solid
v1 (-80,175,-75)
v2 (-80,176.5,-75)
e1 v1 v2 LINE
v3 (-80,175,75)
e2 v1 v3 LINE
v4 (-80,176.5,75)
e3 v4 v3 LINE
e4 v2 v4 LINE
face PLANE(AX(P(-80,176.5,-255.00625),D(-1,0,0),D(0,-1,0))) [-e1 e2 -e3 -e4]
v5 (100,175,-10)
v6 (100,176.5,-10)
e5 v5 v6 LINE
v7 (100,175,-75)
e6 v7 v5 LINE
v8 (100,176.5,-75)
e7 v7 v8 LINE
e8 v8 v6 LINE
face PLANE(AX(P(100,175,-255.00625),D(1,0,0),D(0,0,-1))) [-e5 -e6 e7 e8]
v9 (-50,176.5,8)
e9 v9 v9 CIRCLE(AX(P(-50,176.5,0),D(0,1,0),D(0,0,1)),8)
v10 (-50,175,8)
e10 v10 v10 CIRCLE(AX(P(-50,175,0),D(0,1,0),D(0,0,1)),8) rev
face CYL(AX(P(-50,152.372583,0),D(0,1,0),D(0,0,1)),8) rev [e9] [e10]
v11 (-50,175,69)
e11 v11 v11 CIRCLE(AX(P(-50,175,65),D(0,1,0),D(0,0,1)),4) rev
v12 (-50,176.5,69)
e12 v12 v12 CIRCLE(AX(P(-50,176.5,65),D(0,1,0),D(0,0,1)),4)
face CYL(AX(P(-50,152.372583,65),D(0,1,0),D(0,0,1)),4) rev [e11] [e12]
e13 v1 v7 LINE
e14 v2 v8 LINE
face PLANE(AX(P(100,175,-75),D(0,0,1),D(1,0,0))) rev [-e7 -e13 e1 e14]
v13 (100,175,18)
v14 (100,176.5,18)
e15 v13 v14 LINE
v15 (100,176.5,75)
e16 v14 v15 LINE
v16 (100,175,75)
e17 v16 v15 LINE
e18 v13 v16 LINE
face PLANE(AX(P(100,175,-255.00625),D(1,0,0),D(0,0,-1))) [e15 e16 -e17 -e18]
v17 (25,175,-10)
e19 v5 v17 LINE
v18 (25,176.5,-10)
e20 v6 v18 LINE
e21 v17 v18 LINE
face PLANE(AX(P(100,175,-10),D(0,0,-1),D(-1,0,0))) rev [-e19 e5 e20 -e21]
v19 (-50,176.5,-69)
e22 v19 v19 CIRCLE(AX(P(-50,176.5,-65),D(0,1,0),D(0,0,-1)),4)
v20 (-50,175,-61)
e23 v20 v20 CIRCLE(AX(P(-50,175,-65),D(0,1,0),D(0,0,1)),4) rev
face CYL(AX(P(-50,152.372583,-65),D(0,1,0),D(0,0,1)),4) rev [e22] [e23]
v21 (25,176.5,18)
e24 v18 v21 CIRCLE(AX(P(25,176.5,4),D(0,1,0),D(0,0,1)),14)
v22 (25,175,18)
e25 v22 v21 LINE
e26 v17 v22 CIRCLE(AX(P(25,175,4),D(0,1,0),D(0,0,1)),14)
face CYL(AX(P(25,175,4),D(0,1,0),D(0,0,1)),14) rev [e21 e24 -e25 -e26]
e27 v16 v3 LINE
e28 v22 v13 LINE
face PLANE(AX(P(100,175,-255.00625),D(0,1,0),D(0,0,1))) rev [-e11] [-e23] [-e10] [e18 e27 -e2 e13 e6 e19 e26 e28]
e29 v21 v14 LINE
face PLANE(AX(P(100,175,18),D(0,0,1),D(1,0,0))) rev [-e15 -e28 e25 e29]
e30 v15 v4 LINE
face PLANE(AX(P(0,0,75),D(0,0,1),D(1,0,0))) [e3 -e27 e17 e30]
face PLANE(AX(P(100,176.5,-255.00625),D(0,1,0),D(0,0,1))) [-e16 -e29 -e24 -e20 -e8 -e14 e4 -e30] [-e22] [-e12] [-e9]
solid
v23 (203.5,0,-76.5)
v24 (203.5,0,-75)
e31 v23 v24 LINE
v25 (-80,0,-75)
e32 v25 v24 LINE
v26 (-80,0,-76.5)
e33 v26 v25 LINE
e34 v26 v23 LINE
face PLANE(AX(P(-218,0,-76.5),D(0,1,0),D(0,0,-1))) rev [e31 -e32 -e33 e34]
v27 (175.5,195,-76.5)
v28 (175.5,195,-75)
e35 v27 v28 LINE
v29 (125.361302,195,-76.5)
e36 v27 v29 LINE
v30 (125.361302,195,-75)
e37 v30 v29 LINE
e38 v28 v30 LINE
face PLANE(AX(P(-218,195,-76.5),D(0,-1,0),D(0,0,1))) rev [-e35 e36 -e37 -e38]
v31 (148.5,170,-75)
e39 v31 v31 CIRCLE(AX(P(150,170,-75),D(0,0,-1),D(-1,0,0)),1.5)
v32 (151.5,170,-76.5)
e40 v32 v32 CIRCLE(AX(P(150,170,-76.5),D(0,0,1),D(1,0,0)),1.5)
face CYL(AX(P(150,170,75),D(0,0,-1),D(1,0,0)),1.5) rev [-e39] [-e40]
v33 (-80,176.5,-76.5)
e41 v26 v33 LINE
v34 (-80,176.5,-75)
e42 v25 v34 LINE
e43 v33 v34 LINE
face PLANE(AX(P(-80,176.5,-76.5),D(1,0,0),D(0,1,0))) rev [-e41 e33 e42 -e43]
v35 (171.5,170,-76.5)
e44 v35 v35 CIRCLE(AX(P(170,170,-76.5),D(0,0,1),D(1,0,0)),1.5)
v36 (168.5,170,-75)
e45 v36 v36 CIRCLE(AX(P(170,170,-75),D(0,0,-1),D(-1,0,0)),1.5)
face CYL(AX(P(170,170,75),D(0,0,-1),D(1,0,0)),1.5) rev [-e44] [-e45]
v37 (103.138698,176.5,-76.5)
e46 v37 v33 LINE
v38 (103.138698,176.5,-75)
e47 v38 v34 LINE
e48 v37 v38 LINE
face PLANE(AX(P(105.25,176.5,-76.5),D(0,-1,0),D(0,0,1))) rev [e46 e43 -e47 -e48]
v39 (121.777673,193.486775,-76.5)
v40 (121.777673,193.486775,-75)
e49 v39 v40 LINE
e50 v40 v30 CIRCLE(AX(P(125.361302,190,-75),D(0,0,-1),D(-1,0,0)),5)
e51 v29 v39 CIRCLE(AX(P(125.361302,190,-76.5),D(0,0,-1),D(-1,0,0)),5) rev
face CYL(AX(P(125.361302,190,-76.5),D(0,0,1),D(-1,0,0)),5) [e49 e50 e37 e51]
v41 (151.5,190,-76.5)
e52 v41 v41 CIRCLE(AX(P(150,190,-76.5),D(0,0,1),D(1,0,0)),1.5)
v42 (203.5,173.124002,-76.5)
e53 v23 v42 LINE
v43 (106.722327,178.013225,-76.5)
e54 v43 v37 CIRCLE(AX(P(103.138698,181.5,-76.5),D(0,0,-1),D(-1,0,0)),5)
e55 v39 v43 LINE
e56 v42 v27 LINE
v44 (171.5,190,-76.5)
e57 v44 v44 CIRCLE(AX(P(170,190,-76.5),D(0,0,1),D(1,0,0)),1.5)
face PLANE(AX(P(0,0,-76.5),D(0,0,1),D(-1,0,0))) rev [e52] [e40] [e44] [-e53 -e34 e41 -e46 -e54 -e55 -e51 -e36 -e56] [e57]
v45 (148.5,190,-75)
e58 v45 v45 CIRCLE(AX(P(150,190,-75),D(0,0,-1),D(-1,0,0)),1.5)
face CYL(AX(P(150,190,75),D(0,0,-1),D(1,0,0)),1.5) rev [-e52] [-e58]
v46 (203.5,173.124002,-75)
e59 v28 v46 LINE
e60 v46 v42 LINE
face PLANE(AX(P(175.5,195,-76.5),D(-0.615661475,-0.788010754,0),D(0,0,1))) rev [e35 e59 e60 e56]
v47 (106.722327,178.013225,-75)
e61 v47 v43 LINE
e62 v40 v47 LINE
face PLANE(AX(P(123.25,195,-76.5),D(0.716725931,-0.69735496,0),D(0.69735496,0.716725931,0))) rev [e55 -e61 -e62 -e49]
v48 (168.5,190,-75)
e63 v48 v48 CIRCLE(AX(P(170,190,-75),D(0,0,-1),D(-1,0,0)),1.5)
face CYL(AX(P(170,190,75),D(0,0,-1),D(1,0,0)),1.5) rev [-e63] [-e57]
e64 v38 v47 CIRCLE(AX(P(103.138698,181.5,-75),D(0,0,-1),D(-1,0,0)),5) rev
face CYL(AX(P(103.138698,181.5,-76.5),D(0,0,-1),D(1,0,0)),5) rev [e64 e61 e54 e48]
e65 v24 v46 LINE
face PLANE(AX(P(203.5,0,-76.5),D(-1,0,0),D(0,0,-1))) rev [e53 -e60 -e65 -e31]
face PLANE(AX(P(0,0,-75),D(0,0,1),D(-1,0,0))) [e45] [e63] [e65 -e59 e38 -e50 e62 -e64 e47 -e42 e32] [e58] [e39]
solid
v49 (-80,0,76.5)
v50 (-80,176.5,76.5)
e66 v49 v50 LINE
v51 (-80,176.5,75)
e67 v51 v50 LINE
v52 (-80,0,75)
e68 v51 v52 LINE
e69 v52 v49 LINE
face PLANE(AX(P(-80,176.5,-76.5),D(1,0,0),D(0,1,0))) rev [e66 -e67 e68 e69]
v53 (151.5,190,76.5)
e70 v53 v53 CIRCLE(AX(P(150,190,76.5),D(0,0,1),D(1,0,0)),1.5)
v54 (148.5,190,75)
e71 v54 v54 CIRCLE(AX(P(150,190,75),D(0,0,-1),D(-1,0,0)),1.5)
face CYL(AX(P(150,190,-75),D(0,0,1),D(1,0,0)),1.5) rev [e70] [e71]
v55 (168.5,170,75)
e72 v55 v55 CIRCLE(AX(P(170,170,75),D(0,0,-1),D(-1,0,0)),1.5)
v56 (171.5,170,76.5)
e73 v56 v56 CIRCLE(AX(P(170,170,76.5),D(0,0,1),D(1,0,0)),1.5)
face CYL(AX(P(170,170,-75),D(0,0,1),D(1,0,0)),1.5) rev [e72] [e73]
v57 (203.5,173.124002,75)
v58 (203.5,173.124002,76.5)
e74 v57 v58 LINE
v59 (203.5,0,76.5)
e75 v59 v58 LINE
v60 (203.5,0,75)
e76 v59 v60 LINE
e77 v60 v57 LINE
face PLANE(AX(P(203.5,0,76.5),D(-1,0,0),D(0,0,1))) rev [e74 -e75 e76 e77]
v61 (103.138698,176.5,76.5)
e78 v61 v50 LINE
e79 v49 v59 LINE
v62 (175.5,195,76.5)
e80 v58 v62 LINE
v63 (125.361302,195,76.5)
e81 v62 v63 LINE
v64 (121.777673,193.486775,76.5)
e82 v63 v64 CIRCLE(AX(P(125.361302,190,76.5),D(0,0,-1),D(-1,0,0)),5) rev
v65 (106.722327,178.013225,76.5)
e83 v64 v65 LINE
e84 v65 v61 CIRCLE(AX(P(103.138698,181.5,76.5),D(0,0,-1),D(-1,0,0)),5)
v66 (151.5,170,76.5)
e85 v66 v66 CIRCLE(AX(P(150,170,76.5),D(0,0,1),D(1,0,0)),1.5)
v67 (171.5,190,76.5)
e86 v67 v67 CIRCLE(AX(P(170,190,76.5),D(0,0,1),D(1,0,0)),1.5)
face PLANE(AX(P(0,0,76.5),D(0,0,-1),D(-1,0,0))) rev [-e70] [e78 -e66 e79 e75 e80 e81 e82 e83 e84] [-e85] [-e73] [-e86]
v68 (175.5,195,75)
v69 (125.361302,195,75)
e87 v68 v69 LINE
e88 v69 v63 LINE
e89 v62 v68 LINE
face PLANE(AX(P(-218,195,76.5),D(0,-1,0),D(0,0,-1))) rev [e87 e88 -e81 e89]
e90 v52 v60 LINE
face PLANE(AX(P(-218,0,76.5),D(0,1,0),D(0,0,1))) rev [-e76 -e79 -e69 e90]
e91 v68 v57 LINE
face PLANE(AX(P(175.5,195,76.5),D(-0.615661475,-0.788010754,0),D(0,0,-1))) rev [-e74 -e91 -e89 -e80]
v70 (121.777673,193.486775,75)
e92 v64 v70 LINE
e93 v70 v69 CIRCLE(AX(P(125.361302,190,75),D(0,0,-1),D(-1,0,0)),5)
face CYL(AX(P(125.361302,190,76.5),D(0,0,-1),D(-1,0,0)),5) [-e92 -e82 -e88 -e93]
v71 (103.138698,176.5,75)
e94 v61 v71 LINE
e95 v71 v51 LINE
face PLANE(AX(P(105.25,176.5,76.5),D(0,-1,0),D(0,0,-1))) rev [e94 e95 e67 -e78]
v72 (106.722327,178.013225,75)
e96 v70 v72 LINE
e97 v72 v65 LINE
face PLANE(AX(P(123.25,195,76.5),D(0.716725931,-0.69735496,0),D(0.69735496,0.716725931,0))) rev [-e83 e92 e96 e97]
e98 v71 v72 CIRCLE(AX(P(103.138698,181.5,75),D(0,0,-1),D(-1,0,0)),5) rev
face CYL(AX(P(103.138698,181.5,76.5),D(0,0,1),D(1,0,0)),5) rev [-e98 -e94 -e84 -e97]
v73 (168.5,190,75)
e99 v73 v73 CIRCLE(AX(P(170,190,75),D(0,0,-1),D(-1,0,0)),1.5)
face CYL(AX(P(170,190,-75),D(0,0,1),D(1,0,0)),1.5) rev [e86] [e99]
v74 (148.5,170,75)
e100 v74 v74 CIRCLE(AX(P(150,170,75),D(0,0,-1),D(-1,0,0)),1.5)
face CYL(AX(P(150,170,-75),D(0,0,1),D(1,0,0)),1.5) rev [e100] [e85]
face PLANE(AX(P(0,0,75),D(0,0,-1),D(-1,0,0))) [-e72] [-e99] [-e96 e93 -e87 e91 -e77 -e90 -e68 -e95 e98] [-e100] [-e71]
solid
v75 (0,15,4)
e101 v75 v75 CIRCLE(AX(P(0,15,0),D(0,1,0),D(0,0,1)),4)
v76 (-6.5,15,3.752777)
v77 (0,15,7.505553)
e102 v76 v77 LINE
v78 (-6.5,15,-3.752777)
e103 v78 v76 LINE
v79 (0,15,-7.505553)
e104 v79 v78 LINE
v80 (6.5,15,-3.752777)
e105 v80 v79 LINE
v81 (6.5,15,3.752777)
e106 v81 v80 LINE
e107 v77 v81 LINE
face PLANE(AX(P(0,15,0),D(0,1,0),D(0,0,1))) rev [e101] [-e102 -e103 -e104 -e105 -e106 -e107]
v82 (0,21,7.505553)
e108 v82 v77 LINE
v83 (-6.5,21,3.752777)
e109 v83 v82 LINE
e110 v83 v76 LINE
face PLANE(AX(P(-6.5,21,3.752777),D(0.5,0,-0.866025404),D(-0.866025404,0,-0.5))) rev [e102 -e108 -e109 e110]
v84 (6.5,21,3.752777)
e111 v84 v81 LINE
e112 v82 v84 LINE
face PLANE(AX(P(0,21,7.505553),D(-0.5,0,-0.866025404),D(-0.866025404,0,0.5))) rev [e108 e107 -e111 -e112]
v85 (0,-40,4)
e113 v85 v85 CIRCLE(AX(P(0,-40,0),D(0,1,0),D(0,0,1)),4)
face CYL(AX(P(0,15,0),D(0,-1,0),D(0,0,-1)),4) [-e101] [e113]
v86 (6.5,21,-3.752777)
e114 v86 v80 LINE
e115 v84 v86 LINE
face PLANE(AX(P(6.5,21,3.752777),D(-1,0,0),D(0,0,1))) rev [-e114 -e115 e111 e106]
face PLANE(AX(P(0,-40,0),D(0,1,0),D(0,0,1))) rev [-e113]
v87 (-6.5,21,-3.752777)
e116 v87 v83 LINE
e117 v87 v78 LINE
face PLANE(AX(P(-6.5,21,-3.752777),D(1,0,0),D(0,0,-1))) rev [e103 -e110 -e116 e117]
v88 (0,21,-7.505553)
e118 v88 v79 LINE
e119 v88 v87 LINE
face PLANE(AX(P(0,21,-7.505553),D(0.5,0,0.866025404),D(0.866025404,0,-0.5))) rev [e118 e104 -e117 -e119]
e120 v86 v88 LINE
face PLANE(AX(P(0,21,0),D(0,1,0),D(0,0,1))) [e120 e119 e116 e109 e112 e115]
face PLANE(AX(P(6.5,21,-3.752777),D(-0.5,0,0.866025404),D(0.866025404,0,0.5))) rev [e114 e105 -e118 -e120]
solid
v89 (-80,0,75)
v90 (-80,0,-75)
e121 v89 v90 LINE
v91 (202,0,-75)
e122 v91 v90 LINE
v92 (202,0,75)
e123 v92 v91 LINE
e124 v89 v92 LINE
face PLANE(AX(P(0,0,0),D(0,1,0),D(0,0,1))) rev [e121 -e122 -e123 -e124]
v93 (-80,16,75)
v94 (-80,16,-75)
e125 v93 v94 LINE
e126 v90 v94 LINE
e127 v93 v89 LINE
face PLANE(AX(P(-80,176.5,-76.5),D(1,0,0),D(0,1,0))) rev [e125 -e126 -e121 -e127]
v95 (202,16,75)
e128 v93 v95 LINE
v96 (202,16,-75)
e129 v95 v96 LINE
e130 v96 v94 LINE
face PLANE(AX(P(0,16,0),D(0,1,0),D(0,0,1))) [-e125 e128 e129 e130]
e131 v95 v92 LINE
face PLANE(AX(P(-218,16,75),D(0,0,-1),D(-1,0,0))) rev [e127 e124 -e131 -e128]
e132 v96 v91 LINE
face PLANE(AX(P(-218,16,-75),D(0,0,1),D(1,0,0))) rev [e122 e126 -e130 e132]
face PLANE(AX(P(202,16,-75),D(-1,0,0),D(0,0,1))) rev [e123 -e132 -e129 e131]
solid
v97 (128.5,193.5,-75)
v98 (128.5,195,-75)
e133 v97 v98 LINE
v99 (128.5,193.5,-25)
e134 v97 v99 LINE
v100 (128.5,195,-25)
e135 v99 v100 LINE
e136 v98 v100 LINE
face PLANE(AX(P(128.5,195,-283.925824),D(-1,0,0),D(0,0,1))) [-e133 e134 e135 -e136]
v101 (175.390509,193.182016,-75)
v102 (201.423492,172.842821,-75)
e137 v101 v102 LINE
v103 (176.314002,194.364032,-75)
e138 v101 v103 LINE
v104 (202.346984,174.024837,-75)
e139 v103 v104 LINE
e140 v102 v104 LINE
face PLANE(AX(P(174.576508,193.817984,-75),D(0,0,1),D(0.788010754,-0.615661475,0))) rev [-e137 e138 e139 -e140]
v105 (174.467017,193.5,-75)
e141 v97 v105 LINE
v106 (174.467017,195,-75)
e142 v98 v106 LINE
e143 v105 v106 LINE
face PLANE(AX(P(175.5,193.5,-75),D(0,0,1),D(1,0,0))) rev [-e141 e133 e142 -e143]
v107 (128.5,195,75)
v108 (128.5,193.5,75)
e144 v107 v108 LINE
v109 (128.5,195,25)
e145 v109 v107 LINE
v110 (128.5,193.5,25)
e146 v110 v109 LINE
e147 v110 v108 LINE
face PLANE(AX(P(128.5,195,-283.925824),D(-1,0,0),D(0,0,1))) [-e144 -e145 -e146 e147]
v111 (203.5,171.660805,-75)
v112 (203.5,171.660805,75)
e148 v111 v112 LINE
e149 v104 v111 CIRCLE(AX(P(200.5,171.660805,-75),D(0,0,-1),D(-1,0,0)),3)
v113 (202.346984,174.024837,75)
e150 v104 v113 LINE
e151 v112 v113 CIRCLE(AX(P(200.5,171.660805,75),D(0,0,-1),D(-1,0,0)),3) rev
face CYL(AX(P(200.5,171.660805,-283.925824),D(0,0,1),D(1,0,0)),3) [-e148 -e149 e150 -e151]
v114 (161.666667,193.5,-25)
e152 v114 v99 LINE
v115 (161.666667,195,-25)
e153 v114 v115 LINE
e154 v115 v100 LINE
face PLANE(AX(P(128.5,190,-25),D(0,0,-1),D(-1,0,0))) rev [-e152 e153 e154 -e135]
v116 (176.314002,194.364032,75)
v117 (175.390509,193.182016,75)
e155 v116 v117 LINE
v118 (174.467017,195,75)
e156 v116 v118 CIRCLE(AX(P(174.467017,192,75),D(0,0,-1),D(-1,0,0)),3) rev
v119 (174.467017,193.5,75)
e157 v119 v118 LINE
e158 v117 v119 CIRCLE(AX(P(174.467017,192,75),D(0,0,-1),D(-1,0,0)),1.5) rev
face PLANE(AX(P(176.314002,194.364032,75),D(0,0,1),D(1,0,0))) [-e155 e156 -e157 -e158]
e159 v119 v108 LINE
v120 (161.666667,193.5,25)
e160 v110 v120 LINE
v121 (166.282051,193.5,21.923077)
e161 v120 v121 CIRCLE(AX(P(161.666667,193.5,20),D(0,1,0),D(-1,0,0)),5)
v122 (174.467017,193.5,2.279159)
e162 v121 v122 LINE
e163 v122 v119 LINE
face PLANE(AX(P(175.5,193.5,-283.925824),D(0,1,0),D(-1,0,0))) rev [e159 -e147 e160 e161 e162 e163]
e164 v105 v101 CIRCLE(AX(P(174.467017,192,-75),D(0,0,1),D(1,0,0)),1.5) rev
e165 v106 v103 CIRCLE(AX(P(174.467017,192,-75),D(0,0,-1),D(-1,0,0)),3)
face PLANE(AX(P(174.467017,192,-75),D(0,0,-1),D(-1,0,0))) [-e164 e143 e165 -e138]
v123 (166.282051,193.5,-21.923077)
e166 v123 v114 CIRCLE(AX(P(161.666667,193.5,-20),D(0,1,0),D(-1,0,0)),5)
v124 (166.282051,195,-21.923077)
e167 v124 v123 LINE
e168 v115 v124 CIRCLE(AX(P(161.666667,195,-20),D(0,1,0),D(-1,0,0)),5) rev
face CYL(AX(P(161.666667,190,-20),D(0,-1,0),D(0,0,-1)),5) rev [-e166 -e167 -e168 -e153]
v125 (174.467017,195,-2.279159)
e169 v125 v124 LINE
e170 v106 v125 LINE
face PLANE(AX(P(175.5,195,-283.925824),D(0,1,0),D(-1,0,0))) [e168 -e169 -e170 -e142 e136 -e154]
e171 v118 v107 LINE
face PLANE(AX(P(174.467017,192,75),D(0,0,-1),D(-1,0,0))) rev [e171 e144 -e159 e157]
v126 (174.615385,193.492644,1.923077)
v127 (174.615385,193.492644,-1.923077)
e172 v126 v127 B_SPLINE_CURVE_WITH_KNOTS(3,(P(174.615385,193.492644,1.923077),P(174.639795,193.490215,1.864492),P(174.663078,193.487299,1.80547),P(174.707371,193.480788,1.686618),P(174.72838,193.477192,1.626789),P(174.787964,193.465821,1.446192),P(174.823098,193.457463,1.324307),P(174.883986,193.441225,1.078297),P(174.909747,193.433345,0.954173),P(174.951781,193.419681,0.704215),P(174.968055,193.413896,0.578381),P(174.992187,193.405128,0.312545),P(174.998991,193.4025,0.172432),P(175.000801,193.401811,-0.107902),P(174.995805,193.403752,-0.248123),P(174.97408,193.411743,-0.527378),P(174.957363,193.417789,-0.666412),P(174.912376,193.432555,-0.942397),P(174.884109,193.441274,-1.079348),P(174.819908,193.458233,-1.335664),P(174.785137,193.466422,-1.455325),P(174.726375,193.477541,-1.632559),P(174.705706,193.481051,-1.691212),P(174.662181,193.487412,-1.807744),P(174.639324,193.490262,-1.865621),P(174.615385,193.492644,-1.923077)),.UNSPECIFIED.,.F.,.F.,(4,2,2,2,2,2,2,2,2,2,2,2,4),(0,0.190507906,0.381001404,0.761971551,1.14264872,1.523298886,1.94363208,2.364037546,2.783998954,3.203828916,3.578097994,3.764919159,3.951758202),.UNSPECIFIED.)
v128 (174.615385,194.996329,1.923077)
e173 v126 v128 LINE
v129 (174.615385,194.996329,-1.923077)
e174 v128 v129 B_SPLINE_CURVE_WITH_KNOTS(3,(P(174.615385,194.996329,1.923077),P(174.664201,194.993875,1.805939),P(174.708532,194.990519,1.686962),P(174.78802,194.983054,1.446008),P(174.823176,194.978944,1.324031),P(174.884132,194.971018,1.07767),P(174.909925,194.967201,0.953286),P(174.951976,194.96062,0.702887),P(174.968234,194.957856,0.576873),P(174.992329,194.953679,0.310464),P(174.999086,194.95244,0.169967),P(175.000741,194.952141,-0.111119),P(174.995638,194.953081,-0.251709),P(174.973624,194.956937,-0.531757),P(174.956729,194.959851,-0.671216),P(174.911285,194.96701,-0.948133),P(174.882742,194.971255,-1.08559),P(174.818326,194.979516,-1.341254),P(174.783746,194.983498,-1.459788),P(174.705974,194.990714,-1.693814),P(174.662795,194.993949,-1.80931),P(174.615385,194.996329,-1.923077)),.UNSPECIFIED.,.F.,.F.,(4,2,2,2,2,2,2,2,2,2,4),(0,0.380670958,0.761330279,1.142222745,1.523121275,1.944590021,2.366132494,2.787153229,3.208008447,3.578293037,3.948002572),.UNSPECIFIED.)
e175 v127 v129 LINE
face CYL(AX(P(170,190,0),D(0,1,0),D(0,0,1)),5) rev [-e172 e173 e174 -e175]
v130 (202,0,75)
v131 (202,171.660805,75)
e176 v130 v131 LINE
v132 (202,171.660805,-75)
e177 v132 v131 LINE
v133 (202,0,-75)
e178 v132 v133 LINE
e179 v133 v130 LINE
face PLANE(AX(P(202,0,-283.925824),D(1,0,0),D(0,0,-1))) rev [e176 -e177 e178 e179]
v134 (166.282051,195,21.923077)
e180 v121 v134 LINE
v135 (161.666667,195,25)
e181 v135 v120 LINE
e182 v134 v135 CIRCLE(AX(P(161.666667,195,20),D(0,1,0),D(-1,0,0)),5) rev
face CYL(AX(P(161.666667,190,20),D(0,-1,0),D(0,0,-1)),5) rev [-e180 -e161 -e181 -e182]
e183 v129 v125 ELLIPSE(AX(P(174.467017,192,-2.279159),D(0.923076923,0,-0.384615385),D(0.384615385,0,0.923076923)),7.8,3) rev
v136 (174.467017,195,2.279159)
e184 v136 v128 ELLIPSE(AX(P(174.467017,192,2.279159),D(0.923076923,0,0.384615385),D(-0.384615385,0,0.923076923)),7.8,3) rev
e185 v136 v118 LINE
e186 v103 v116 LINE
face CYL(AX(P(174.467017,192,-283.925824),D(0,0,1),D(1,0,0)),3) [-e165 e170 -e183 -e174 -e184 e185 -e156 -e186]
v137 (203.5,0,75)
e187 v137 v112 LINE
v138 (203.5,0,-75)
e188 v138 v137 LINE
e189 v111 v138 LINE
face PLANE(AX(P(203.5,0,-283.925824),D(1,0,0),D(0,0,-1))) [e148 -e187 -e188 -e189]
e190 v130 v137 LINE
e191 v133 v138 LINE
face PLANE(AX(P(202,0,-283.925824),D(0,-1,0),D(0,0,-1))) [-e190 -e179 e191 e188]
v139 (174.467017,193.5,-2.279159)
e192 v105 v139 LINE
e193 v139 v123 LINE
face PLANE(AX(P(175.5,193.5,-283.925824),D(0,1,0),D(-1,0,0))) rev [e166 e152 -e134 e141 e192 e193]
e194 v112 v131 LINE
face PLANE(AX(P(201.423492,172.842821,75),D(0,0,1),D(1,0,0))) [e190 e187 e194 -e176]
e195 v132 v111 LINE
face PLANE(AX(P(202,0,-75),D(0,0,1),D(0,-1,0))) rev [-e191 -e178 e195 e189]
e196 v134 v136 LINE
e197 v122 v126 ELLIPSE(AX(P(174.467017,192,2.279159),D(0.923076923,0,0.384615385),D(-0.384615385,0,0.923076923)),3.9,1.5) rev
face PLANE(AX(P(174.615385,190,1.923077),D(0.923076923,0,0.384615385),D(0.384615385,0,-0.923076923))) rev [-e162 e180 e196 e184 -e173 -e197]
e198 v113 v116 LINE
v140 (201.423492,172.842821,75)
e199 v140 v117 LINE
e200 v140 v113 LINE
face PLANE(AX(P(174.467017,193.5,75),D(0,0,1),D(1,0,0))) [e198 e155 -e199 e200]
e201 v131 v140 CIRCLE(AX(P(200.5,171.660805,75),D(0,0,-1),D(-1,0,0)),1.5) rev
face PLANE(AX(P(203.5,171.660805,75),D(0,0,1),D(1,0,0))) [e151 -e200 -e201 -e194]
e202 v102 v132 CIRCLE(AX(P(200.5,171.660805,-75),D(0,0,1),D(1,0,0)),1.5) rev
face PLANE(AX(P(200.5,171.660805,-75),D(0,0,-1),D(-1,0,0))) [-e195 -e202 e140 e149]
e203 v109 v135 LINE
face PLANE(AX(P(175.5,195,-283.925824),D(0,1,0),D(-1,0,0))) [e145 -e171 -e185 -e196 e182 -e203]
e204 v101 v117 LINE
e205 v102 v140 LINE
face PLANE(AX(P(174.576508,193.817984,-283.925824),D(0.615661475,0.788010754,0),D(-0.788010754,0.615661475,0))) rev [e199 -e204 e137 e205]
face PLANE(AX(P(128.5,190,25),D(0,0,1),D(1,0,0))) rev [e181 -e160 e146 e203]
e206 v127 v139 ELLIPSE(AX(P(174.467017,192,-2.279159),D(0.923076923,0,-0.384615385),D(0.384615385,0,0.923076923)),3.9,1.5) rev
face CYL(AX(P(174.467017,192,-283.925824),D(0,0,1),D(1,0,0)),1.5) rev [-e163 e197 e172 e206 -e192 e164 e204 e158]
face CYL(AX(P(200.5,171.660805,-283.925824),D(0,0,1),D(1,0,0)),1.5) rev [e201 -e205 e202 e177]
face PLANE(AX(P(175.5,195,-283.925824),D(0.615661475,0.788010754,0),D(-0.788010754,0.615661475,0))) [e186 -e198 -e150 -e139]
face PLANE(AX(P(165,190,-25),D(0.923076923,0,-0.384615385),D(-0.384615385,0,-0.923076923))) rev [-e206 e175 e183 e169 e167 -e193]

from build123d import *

# Parameters (mm, degrees)
BOSS_EXTRU_1_DEPTH        = 15
BOSS_EXTRU_1_DEPTH_BACK   = 40
ESQUISSE1_R               = 4
ESQUISSE2_W               = 420
ESQUISSE2_H               = 150
BOSS_EXTRU_2_DEPTH        = 16
BOSS_EXTRU_3_DEPTH        = 6
ESQUISSE5_W               = 421.5
ESQUISSE5_H               = 195
BOSS_EXTRU_4_DEPTH        = 1.5
T_LE_DE_BASE_PLI_E1_DEPTH = 150
ESQUISSE11_R              = 1.5
ENL_V_MAT_EXTRU_1_DEPTH   = 330.395279262
ENL_V_MAT_EXTRU_2_DEPTH   = 5
CONG_1_R                  = 5
ESQUISSE13_W              = 180
ESQUISSE13_H              = 1.5
T_LE_DE_BASE_PLI_E2_DEPTH = 150
ENL_V_MAT_EXTRU_4_DEPTH   = 329.70807728
CONG_3_R                  = 5
CHANFREIN1_SIZE           = 28
CHANFREIN1_SIZE2          = 21.875997542
ENL_V_MAT_EXTRU_3_DEPTH   = 1.5
ESQUISSE18_R              = 8
ESQUISSE18_R_2            = 4
ENL_V_MAT_EXTRU_5_DEPTH   = 1.5
ESQUISSE19_W              = 138
ESQUISSE19_H              = 176.5
ENL_V_MAT_EXTRU_6_DEPTH   = 331.087867149


# Sheet-metal steps are written as plain solids
with BuildPart() as part:
    # Esquisse1 → Boss.-Extru.1 (new, two sides: drawn at the far end of the back side and taken through both)
    with BuildSketch(Plane(origin=(0, 0, 0), x_dir=(1, 0, 0), z_dir=(0, 1, 0)).offset(-BOSS_EXTRU_1_DEPTH_BACK)):
        with Locations(Location((0, 0, 0), (0, 0, 270))):
            Circle(ESQUISSE1_R)
    extrude(amount=BOSS_EXTRU_1_DEPTH + BOSS_EXTRU_1_DEPTH_BACK)

    # Esquisse4 → Boss.-Extru.3 (add)
    with BuildSketch(Plane(origin=(0, 15, 0), x_dir=(1, 0, 0), z_dir=(0, 1, 0))):
        Polygon((6.5, 3.75277675), (0, 7.505553499), (-6.5, 3.75277675), (-6.5, -3.75277675), (0, -7.505553499), (6.5, -3.75277675), align=None)
    extrude(amount=BOSS_EXTRU_3_DEPTH)


with BuildPart() as body_2:
    # Esquisse2 → Boss.-Extru.2 (new body)
    with BuildSketch(Plane(origin=(0, 0, 0), x_dir=(1, 0, 0), z_dir=(0, 1, 0))):
        with Locations((-8, 0)):
            Rectangle(ESQUISSE2_W, ESQUISSE2_H)
    extrude(amount=BOSS_EXTRU_2_DEPTH)


with BuildPart() as body_3:
    # Esquisse5 → Boss.-Extru.4 (new body)
    with BuildSketch(Plane.XY.offset(75)):
        with Locations((-7.25, 97.5)):
            Rectangle(ESQUISSE5_W, ESQUISSE5_H)
    extrude(amount=BOSS_EXTRU_4_DEPTH)

    # Esquisse11 → Enlèv. mat.-Extru.1 (cut, through all)
    with BuildSketch(Plane.XY.offset(76.5)):
        with Locations((150, 190)):
            Circle(ESQUISSE11_R)
        with Locations((150, 170)):
            Circle(ESQUISSE11_R)
        with Locations((170, 170)):
            Circle(ESQUISSE11_R)
        with Locations((170, 190)):
            Circle(ESQUISSE11_R)
    extrude(amount=-ENL_V_MAT_EXTRU_1_DEPTH, mode=Mode.SUBTRACT)

    # Esquisse17 → Enlèv. mat.-Extru.4 (cut, through all)
    with BuildSketch(Plane(origin=(0, 0, 75), x_dir=(-1, 0, 0), z_dir=(0, 0, -1))):
        Polygon((-123.25, 195), (-105.25, 176.5), (218, 176.5), (218, 195), align=None)
    extrude(amount=-ENL_V_MAT_EXTRU_4_DEPTH, mode=Mode.SUBTRACT)

    # Congé3
    cong_3_edges = [body_3.edges().sort_by_distance(p)[0] for p in [
        (123.25, 195, 75.75),
        (105.25, 176.5, 75.75),
    ]]
    fillet(cong_3_edges, radius=CONG_3_R)

    # Chanfrein1
    chanfrein1_edges = [body_3.edges().sort_by_distance(p)[0] for p in [
        (203.5, 195, 75.75),
    ]]
    chanfrein1_side = [body_3.faces().sort_by_distance(p)[0] for p in [
        (164.430651216, 195, 75.75),
    ]]
    chamfer(chanfrein1_edges, length=CHANFREIN1_SIZE, length2=CHANFREIN1_SIZE2, reference=chanfrein1_side[0])


with BuildPart() as body_4:
    # Esquisse6 → Tôle de base pliée1 (new body)
    with BuildSketch(Plane(origin=(0, 0, 75), x_dir=(-1, 0, 0), z_dir=(0, 0, -1))):
        with BuildLine():
            Line((-203.5, 0), (-203.5, 171.660804692))
            ThreePointArc((-203.5, 171.660804692), (-203.196382139, 172.975918132), (-202.346984426, 174.024836953))
            Line((-202.346984426, 174.024836953), (-176.314001586, 194.364032261))
            ThreePointArc((-176.314001586, 194.364032261), (-175.443721624, 194.836555727), (-174.46701716, 195))
            Line((-174.46701716, 195), (-128.5, 195))
            Line((-128.5, 195), (-128.5, 193.5))
            Line((-128.5, 193.5), (-174.46701716, 193.5))
            ThreePointArc((-174.46701716, 193.5), (-174.955369392, 193.418277863), (-175.390509373, 193.18201613))
            Line((-175.390509373, 193.18201613), (-201.423492213, 172.842820823))
            ThreePointArc((-201.423492213, 172.842820823), (-201.848191069, 172.318361412), (-202, 171.660804692))
            Line((-202, 171.660804692), (-202, 0))
            Line((-202, 0), (-203.5, 0))
        make_face()
    extrude(amount=T_LE_DE_BASE_PLI_E1_DEPTH)

    # Esquisse12 → Enlèv. mat.-Extru.2 (cut)
    with BuildSketch(Plane(origin=(0, 195, 0), x_dir=(1, 0, 0), z_dir=(0, 1, 0))):
        with BuildLine():
            Line((128.5, 25), (165, 25))
            Line((165, 25), (174.615384615, 1.923076923))
            ThreePointArc((174.615384615, 1.923076923), (175, 0), (174.615384615, -1.923076923))
            Line((174.615384615, -1.923076923), (165, -25))
            Line((165, -25), (128.5, -25))
            Line((128.5, -25), (128.5, 25))
        make_face()
    extrude(amount=-ENL_V_MAT_EXTRU_2_DEPTH, mode=Mode.SUBTRACT)

    # Congé1
    cong_1_edges = [body_4.edges().sort_by_distance(p)[0] for p in [
        (165, 194.25, 25),
        (165, 194.25, -25),
    ]]
    fillet(cong_1_edges, radius=CONG_1_R)


with BuildPart() as body_5:
    # Esquisse13 → Tôle de base pliée2 (new body)
    with BuildSketch(Plane(origin=(0, 0, 75), x_dir=(-1, 0, 0), z_dir=(0, 0, -1))):
        with Locations((-10, 175.75)):
            Rectangle(ESQUISSE13_W, ESQUISSE13_H)
    extrude(amount=T_LE_DE_BASE_PLI_E2_DEPTH)

    # Esquisse16 → Enlèv. mat.-Extru.3 (cut)
    with BuildSketch(Plane(origin=(0, 176.5, 0), x_dir=(1, 0, 0), z_dir=(0, 1, 0))):
        with BuildLine():
            Line((100, 10), (25, 10))
            ThreePointArc((25, 10), (11, -4), (25, -18))
            Line((25, -18), (100, -18))
            Line((100, -18), (100, 10))
        make_face()
    extrude(amount=-ENL_V_MAT_EXTRU_3_DEPTH, mode=Mode.SUBTRACT)

    # Esquisse18 → Enlèv. mat.-Extru.5 (cut)
    with BuildSketch(Plane(origin=(0, 176.5, 0), x_dir=(1, 0, 0), z_dir=(0, 1, 0))):
        with Locations(Location((-50, 0, 0), (0, 0, 270))):
            Circle(ESQUISSE18_R)
        with Locations(Location((-50, -65, 0), (0, 0, 270))):
            Circle(ESQUISSE18_R_2)
        with Locations(Location((-50, 65, 0), (0, 0, 270))):
            Circle(ESQUISSE18_R_2)
    extrude(amount=-ENL_V_MAT_EXTRU_5_DEPTH, mode=Mode.SUBTRACT)


with BuildPart() as body_6:
    # Symétrie1: mirrored copy
    add(body_3.part.mirror(Plane.XY))


with BuildPart() as enl_v_mat_extru_6_tool:
    # Esquisse19 → Enlèv. mat.-Extru.6 (new, through all)
    with BuildSketch(Plane.XY.offset(76.5)):
        with Locations((-149, 88.25)):
            Rectangle(ESQUISSE19_W, ESQUISSE19_H)
    extrude(amount=-ENL_V_MAT_EXTRU_6_DEPTH)


with BuildPart() as body_2_1:
    add(body_2.part)

    # Enlèv. mat.-Extru.6: cut by enl_v_mat_extru_6_tool
    add(enl_v_mat_extru_6_tool.part, mode=Mode.SUBTRACT)


with BuildPart() as body_3_1:
    add(body_3.part)

    # Enlèv. mat.-Extru.6: cut by enl_v_mat_extru_6_tool
    add(enl_v_mat_extru_6_tool.part, mode=Mode.SUBTRACT)


with BuildPart() as body_6_1:
    add(body_6.part)

    # Enlèv. mat.-Extru.6: cut by enl_v_mat_extru_6_tool
    add(enl_v_mat_extru_6_tool.part, mode=Mode.SUBTRACT)


solid = Compound([part.part, body_4.part, body_5.part, body_2_1.part, body_3_1.part, body_6_1.part])
